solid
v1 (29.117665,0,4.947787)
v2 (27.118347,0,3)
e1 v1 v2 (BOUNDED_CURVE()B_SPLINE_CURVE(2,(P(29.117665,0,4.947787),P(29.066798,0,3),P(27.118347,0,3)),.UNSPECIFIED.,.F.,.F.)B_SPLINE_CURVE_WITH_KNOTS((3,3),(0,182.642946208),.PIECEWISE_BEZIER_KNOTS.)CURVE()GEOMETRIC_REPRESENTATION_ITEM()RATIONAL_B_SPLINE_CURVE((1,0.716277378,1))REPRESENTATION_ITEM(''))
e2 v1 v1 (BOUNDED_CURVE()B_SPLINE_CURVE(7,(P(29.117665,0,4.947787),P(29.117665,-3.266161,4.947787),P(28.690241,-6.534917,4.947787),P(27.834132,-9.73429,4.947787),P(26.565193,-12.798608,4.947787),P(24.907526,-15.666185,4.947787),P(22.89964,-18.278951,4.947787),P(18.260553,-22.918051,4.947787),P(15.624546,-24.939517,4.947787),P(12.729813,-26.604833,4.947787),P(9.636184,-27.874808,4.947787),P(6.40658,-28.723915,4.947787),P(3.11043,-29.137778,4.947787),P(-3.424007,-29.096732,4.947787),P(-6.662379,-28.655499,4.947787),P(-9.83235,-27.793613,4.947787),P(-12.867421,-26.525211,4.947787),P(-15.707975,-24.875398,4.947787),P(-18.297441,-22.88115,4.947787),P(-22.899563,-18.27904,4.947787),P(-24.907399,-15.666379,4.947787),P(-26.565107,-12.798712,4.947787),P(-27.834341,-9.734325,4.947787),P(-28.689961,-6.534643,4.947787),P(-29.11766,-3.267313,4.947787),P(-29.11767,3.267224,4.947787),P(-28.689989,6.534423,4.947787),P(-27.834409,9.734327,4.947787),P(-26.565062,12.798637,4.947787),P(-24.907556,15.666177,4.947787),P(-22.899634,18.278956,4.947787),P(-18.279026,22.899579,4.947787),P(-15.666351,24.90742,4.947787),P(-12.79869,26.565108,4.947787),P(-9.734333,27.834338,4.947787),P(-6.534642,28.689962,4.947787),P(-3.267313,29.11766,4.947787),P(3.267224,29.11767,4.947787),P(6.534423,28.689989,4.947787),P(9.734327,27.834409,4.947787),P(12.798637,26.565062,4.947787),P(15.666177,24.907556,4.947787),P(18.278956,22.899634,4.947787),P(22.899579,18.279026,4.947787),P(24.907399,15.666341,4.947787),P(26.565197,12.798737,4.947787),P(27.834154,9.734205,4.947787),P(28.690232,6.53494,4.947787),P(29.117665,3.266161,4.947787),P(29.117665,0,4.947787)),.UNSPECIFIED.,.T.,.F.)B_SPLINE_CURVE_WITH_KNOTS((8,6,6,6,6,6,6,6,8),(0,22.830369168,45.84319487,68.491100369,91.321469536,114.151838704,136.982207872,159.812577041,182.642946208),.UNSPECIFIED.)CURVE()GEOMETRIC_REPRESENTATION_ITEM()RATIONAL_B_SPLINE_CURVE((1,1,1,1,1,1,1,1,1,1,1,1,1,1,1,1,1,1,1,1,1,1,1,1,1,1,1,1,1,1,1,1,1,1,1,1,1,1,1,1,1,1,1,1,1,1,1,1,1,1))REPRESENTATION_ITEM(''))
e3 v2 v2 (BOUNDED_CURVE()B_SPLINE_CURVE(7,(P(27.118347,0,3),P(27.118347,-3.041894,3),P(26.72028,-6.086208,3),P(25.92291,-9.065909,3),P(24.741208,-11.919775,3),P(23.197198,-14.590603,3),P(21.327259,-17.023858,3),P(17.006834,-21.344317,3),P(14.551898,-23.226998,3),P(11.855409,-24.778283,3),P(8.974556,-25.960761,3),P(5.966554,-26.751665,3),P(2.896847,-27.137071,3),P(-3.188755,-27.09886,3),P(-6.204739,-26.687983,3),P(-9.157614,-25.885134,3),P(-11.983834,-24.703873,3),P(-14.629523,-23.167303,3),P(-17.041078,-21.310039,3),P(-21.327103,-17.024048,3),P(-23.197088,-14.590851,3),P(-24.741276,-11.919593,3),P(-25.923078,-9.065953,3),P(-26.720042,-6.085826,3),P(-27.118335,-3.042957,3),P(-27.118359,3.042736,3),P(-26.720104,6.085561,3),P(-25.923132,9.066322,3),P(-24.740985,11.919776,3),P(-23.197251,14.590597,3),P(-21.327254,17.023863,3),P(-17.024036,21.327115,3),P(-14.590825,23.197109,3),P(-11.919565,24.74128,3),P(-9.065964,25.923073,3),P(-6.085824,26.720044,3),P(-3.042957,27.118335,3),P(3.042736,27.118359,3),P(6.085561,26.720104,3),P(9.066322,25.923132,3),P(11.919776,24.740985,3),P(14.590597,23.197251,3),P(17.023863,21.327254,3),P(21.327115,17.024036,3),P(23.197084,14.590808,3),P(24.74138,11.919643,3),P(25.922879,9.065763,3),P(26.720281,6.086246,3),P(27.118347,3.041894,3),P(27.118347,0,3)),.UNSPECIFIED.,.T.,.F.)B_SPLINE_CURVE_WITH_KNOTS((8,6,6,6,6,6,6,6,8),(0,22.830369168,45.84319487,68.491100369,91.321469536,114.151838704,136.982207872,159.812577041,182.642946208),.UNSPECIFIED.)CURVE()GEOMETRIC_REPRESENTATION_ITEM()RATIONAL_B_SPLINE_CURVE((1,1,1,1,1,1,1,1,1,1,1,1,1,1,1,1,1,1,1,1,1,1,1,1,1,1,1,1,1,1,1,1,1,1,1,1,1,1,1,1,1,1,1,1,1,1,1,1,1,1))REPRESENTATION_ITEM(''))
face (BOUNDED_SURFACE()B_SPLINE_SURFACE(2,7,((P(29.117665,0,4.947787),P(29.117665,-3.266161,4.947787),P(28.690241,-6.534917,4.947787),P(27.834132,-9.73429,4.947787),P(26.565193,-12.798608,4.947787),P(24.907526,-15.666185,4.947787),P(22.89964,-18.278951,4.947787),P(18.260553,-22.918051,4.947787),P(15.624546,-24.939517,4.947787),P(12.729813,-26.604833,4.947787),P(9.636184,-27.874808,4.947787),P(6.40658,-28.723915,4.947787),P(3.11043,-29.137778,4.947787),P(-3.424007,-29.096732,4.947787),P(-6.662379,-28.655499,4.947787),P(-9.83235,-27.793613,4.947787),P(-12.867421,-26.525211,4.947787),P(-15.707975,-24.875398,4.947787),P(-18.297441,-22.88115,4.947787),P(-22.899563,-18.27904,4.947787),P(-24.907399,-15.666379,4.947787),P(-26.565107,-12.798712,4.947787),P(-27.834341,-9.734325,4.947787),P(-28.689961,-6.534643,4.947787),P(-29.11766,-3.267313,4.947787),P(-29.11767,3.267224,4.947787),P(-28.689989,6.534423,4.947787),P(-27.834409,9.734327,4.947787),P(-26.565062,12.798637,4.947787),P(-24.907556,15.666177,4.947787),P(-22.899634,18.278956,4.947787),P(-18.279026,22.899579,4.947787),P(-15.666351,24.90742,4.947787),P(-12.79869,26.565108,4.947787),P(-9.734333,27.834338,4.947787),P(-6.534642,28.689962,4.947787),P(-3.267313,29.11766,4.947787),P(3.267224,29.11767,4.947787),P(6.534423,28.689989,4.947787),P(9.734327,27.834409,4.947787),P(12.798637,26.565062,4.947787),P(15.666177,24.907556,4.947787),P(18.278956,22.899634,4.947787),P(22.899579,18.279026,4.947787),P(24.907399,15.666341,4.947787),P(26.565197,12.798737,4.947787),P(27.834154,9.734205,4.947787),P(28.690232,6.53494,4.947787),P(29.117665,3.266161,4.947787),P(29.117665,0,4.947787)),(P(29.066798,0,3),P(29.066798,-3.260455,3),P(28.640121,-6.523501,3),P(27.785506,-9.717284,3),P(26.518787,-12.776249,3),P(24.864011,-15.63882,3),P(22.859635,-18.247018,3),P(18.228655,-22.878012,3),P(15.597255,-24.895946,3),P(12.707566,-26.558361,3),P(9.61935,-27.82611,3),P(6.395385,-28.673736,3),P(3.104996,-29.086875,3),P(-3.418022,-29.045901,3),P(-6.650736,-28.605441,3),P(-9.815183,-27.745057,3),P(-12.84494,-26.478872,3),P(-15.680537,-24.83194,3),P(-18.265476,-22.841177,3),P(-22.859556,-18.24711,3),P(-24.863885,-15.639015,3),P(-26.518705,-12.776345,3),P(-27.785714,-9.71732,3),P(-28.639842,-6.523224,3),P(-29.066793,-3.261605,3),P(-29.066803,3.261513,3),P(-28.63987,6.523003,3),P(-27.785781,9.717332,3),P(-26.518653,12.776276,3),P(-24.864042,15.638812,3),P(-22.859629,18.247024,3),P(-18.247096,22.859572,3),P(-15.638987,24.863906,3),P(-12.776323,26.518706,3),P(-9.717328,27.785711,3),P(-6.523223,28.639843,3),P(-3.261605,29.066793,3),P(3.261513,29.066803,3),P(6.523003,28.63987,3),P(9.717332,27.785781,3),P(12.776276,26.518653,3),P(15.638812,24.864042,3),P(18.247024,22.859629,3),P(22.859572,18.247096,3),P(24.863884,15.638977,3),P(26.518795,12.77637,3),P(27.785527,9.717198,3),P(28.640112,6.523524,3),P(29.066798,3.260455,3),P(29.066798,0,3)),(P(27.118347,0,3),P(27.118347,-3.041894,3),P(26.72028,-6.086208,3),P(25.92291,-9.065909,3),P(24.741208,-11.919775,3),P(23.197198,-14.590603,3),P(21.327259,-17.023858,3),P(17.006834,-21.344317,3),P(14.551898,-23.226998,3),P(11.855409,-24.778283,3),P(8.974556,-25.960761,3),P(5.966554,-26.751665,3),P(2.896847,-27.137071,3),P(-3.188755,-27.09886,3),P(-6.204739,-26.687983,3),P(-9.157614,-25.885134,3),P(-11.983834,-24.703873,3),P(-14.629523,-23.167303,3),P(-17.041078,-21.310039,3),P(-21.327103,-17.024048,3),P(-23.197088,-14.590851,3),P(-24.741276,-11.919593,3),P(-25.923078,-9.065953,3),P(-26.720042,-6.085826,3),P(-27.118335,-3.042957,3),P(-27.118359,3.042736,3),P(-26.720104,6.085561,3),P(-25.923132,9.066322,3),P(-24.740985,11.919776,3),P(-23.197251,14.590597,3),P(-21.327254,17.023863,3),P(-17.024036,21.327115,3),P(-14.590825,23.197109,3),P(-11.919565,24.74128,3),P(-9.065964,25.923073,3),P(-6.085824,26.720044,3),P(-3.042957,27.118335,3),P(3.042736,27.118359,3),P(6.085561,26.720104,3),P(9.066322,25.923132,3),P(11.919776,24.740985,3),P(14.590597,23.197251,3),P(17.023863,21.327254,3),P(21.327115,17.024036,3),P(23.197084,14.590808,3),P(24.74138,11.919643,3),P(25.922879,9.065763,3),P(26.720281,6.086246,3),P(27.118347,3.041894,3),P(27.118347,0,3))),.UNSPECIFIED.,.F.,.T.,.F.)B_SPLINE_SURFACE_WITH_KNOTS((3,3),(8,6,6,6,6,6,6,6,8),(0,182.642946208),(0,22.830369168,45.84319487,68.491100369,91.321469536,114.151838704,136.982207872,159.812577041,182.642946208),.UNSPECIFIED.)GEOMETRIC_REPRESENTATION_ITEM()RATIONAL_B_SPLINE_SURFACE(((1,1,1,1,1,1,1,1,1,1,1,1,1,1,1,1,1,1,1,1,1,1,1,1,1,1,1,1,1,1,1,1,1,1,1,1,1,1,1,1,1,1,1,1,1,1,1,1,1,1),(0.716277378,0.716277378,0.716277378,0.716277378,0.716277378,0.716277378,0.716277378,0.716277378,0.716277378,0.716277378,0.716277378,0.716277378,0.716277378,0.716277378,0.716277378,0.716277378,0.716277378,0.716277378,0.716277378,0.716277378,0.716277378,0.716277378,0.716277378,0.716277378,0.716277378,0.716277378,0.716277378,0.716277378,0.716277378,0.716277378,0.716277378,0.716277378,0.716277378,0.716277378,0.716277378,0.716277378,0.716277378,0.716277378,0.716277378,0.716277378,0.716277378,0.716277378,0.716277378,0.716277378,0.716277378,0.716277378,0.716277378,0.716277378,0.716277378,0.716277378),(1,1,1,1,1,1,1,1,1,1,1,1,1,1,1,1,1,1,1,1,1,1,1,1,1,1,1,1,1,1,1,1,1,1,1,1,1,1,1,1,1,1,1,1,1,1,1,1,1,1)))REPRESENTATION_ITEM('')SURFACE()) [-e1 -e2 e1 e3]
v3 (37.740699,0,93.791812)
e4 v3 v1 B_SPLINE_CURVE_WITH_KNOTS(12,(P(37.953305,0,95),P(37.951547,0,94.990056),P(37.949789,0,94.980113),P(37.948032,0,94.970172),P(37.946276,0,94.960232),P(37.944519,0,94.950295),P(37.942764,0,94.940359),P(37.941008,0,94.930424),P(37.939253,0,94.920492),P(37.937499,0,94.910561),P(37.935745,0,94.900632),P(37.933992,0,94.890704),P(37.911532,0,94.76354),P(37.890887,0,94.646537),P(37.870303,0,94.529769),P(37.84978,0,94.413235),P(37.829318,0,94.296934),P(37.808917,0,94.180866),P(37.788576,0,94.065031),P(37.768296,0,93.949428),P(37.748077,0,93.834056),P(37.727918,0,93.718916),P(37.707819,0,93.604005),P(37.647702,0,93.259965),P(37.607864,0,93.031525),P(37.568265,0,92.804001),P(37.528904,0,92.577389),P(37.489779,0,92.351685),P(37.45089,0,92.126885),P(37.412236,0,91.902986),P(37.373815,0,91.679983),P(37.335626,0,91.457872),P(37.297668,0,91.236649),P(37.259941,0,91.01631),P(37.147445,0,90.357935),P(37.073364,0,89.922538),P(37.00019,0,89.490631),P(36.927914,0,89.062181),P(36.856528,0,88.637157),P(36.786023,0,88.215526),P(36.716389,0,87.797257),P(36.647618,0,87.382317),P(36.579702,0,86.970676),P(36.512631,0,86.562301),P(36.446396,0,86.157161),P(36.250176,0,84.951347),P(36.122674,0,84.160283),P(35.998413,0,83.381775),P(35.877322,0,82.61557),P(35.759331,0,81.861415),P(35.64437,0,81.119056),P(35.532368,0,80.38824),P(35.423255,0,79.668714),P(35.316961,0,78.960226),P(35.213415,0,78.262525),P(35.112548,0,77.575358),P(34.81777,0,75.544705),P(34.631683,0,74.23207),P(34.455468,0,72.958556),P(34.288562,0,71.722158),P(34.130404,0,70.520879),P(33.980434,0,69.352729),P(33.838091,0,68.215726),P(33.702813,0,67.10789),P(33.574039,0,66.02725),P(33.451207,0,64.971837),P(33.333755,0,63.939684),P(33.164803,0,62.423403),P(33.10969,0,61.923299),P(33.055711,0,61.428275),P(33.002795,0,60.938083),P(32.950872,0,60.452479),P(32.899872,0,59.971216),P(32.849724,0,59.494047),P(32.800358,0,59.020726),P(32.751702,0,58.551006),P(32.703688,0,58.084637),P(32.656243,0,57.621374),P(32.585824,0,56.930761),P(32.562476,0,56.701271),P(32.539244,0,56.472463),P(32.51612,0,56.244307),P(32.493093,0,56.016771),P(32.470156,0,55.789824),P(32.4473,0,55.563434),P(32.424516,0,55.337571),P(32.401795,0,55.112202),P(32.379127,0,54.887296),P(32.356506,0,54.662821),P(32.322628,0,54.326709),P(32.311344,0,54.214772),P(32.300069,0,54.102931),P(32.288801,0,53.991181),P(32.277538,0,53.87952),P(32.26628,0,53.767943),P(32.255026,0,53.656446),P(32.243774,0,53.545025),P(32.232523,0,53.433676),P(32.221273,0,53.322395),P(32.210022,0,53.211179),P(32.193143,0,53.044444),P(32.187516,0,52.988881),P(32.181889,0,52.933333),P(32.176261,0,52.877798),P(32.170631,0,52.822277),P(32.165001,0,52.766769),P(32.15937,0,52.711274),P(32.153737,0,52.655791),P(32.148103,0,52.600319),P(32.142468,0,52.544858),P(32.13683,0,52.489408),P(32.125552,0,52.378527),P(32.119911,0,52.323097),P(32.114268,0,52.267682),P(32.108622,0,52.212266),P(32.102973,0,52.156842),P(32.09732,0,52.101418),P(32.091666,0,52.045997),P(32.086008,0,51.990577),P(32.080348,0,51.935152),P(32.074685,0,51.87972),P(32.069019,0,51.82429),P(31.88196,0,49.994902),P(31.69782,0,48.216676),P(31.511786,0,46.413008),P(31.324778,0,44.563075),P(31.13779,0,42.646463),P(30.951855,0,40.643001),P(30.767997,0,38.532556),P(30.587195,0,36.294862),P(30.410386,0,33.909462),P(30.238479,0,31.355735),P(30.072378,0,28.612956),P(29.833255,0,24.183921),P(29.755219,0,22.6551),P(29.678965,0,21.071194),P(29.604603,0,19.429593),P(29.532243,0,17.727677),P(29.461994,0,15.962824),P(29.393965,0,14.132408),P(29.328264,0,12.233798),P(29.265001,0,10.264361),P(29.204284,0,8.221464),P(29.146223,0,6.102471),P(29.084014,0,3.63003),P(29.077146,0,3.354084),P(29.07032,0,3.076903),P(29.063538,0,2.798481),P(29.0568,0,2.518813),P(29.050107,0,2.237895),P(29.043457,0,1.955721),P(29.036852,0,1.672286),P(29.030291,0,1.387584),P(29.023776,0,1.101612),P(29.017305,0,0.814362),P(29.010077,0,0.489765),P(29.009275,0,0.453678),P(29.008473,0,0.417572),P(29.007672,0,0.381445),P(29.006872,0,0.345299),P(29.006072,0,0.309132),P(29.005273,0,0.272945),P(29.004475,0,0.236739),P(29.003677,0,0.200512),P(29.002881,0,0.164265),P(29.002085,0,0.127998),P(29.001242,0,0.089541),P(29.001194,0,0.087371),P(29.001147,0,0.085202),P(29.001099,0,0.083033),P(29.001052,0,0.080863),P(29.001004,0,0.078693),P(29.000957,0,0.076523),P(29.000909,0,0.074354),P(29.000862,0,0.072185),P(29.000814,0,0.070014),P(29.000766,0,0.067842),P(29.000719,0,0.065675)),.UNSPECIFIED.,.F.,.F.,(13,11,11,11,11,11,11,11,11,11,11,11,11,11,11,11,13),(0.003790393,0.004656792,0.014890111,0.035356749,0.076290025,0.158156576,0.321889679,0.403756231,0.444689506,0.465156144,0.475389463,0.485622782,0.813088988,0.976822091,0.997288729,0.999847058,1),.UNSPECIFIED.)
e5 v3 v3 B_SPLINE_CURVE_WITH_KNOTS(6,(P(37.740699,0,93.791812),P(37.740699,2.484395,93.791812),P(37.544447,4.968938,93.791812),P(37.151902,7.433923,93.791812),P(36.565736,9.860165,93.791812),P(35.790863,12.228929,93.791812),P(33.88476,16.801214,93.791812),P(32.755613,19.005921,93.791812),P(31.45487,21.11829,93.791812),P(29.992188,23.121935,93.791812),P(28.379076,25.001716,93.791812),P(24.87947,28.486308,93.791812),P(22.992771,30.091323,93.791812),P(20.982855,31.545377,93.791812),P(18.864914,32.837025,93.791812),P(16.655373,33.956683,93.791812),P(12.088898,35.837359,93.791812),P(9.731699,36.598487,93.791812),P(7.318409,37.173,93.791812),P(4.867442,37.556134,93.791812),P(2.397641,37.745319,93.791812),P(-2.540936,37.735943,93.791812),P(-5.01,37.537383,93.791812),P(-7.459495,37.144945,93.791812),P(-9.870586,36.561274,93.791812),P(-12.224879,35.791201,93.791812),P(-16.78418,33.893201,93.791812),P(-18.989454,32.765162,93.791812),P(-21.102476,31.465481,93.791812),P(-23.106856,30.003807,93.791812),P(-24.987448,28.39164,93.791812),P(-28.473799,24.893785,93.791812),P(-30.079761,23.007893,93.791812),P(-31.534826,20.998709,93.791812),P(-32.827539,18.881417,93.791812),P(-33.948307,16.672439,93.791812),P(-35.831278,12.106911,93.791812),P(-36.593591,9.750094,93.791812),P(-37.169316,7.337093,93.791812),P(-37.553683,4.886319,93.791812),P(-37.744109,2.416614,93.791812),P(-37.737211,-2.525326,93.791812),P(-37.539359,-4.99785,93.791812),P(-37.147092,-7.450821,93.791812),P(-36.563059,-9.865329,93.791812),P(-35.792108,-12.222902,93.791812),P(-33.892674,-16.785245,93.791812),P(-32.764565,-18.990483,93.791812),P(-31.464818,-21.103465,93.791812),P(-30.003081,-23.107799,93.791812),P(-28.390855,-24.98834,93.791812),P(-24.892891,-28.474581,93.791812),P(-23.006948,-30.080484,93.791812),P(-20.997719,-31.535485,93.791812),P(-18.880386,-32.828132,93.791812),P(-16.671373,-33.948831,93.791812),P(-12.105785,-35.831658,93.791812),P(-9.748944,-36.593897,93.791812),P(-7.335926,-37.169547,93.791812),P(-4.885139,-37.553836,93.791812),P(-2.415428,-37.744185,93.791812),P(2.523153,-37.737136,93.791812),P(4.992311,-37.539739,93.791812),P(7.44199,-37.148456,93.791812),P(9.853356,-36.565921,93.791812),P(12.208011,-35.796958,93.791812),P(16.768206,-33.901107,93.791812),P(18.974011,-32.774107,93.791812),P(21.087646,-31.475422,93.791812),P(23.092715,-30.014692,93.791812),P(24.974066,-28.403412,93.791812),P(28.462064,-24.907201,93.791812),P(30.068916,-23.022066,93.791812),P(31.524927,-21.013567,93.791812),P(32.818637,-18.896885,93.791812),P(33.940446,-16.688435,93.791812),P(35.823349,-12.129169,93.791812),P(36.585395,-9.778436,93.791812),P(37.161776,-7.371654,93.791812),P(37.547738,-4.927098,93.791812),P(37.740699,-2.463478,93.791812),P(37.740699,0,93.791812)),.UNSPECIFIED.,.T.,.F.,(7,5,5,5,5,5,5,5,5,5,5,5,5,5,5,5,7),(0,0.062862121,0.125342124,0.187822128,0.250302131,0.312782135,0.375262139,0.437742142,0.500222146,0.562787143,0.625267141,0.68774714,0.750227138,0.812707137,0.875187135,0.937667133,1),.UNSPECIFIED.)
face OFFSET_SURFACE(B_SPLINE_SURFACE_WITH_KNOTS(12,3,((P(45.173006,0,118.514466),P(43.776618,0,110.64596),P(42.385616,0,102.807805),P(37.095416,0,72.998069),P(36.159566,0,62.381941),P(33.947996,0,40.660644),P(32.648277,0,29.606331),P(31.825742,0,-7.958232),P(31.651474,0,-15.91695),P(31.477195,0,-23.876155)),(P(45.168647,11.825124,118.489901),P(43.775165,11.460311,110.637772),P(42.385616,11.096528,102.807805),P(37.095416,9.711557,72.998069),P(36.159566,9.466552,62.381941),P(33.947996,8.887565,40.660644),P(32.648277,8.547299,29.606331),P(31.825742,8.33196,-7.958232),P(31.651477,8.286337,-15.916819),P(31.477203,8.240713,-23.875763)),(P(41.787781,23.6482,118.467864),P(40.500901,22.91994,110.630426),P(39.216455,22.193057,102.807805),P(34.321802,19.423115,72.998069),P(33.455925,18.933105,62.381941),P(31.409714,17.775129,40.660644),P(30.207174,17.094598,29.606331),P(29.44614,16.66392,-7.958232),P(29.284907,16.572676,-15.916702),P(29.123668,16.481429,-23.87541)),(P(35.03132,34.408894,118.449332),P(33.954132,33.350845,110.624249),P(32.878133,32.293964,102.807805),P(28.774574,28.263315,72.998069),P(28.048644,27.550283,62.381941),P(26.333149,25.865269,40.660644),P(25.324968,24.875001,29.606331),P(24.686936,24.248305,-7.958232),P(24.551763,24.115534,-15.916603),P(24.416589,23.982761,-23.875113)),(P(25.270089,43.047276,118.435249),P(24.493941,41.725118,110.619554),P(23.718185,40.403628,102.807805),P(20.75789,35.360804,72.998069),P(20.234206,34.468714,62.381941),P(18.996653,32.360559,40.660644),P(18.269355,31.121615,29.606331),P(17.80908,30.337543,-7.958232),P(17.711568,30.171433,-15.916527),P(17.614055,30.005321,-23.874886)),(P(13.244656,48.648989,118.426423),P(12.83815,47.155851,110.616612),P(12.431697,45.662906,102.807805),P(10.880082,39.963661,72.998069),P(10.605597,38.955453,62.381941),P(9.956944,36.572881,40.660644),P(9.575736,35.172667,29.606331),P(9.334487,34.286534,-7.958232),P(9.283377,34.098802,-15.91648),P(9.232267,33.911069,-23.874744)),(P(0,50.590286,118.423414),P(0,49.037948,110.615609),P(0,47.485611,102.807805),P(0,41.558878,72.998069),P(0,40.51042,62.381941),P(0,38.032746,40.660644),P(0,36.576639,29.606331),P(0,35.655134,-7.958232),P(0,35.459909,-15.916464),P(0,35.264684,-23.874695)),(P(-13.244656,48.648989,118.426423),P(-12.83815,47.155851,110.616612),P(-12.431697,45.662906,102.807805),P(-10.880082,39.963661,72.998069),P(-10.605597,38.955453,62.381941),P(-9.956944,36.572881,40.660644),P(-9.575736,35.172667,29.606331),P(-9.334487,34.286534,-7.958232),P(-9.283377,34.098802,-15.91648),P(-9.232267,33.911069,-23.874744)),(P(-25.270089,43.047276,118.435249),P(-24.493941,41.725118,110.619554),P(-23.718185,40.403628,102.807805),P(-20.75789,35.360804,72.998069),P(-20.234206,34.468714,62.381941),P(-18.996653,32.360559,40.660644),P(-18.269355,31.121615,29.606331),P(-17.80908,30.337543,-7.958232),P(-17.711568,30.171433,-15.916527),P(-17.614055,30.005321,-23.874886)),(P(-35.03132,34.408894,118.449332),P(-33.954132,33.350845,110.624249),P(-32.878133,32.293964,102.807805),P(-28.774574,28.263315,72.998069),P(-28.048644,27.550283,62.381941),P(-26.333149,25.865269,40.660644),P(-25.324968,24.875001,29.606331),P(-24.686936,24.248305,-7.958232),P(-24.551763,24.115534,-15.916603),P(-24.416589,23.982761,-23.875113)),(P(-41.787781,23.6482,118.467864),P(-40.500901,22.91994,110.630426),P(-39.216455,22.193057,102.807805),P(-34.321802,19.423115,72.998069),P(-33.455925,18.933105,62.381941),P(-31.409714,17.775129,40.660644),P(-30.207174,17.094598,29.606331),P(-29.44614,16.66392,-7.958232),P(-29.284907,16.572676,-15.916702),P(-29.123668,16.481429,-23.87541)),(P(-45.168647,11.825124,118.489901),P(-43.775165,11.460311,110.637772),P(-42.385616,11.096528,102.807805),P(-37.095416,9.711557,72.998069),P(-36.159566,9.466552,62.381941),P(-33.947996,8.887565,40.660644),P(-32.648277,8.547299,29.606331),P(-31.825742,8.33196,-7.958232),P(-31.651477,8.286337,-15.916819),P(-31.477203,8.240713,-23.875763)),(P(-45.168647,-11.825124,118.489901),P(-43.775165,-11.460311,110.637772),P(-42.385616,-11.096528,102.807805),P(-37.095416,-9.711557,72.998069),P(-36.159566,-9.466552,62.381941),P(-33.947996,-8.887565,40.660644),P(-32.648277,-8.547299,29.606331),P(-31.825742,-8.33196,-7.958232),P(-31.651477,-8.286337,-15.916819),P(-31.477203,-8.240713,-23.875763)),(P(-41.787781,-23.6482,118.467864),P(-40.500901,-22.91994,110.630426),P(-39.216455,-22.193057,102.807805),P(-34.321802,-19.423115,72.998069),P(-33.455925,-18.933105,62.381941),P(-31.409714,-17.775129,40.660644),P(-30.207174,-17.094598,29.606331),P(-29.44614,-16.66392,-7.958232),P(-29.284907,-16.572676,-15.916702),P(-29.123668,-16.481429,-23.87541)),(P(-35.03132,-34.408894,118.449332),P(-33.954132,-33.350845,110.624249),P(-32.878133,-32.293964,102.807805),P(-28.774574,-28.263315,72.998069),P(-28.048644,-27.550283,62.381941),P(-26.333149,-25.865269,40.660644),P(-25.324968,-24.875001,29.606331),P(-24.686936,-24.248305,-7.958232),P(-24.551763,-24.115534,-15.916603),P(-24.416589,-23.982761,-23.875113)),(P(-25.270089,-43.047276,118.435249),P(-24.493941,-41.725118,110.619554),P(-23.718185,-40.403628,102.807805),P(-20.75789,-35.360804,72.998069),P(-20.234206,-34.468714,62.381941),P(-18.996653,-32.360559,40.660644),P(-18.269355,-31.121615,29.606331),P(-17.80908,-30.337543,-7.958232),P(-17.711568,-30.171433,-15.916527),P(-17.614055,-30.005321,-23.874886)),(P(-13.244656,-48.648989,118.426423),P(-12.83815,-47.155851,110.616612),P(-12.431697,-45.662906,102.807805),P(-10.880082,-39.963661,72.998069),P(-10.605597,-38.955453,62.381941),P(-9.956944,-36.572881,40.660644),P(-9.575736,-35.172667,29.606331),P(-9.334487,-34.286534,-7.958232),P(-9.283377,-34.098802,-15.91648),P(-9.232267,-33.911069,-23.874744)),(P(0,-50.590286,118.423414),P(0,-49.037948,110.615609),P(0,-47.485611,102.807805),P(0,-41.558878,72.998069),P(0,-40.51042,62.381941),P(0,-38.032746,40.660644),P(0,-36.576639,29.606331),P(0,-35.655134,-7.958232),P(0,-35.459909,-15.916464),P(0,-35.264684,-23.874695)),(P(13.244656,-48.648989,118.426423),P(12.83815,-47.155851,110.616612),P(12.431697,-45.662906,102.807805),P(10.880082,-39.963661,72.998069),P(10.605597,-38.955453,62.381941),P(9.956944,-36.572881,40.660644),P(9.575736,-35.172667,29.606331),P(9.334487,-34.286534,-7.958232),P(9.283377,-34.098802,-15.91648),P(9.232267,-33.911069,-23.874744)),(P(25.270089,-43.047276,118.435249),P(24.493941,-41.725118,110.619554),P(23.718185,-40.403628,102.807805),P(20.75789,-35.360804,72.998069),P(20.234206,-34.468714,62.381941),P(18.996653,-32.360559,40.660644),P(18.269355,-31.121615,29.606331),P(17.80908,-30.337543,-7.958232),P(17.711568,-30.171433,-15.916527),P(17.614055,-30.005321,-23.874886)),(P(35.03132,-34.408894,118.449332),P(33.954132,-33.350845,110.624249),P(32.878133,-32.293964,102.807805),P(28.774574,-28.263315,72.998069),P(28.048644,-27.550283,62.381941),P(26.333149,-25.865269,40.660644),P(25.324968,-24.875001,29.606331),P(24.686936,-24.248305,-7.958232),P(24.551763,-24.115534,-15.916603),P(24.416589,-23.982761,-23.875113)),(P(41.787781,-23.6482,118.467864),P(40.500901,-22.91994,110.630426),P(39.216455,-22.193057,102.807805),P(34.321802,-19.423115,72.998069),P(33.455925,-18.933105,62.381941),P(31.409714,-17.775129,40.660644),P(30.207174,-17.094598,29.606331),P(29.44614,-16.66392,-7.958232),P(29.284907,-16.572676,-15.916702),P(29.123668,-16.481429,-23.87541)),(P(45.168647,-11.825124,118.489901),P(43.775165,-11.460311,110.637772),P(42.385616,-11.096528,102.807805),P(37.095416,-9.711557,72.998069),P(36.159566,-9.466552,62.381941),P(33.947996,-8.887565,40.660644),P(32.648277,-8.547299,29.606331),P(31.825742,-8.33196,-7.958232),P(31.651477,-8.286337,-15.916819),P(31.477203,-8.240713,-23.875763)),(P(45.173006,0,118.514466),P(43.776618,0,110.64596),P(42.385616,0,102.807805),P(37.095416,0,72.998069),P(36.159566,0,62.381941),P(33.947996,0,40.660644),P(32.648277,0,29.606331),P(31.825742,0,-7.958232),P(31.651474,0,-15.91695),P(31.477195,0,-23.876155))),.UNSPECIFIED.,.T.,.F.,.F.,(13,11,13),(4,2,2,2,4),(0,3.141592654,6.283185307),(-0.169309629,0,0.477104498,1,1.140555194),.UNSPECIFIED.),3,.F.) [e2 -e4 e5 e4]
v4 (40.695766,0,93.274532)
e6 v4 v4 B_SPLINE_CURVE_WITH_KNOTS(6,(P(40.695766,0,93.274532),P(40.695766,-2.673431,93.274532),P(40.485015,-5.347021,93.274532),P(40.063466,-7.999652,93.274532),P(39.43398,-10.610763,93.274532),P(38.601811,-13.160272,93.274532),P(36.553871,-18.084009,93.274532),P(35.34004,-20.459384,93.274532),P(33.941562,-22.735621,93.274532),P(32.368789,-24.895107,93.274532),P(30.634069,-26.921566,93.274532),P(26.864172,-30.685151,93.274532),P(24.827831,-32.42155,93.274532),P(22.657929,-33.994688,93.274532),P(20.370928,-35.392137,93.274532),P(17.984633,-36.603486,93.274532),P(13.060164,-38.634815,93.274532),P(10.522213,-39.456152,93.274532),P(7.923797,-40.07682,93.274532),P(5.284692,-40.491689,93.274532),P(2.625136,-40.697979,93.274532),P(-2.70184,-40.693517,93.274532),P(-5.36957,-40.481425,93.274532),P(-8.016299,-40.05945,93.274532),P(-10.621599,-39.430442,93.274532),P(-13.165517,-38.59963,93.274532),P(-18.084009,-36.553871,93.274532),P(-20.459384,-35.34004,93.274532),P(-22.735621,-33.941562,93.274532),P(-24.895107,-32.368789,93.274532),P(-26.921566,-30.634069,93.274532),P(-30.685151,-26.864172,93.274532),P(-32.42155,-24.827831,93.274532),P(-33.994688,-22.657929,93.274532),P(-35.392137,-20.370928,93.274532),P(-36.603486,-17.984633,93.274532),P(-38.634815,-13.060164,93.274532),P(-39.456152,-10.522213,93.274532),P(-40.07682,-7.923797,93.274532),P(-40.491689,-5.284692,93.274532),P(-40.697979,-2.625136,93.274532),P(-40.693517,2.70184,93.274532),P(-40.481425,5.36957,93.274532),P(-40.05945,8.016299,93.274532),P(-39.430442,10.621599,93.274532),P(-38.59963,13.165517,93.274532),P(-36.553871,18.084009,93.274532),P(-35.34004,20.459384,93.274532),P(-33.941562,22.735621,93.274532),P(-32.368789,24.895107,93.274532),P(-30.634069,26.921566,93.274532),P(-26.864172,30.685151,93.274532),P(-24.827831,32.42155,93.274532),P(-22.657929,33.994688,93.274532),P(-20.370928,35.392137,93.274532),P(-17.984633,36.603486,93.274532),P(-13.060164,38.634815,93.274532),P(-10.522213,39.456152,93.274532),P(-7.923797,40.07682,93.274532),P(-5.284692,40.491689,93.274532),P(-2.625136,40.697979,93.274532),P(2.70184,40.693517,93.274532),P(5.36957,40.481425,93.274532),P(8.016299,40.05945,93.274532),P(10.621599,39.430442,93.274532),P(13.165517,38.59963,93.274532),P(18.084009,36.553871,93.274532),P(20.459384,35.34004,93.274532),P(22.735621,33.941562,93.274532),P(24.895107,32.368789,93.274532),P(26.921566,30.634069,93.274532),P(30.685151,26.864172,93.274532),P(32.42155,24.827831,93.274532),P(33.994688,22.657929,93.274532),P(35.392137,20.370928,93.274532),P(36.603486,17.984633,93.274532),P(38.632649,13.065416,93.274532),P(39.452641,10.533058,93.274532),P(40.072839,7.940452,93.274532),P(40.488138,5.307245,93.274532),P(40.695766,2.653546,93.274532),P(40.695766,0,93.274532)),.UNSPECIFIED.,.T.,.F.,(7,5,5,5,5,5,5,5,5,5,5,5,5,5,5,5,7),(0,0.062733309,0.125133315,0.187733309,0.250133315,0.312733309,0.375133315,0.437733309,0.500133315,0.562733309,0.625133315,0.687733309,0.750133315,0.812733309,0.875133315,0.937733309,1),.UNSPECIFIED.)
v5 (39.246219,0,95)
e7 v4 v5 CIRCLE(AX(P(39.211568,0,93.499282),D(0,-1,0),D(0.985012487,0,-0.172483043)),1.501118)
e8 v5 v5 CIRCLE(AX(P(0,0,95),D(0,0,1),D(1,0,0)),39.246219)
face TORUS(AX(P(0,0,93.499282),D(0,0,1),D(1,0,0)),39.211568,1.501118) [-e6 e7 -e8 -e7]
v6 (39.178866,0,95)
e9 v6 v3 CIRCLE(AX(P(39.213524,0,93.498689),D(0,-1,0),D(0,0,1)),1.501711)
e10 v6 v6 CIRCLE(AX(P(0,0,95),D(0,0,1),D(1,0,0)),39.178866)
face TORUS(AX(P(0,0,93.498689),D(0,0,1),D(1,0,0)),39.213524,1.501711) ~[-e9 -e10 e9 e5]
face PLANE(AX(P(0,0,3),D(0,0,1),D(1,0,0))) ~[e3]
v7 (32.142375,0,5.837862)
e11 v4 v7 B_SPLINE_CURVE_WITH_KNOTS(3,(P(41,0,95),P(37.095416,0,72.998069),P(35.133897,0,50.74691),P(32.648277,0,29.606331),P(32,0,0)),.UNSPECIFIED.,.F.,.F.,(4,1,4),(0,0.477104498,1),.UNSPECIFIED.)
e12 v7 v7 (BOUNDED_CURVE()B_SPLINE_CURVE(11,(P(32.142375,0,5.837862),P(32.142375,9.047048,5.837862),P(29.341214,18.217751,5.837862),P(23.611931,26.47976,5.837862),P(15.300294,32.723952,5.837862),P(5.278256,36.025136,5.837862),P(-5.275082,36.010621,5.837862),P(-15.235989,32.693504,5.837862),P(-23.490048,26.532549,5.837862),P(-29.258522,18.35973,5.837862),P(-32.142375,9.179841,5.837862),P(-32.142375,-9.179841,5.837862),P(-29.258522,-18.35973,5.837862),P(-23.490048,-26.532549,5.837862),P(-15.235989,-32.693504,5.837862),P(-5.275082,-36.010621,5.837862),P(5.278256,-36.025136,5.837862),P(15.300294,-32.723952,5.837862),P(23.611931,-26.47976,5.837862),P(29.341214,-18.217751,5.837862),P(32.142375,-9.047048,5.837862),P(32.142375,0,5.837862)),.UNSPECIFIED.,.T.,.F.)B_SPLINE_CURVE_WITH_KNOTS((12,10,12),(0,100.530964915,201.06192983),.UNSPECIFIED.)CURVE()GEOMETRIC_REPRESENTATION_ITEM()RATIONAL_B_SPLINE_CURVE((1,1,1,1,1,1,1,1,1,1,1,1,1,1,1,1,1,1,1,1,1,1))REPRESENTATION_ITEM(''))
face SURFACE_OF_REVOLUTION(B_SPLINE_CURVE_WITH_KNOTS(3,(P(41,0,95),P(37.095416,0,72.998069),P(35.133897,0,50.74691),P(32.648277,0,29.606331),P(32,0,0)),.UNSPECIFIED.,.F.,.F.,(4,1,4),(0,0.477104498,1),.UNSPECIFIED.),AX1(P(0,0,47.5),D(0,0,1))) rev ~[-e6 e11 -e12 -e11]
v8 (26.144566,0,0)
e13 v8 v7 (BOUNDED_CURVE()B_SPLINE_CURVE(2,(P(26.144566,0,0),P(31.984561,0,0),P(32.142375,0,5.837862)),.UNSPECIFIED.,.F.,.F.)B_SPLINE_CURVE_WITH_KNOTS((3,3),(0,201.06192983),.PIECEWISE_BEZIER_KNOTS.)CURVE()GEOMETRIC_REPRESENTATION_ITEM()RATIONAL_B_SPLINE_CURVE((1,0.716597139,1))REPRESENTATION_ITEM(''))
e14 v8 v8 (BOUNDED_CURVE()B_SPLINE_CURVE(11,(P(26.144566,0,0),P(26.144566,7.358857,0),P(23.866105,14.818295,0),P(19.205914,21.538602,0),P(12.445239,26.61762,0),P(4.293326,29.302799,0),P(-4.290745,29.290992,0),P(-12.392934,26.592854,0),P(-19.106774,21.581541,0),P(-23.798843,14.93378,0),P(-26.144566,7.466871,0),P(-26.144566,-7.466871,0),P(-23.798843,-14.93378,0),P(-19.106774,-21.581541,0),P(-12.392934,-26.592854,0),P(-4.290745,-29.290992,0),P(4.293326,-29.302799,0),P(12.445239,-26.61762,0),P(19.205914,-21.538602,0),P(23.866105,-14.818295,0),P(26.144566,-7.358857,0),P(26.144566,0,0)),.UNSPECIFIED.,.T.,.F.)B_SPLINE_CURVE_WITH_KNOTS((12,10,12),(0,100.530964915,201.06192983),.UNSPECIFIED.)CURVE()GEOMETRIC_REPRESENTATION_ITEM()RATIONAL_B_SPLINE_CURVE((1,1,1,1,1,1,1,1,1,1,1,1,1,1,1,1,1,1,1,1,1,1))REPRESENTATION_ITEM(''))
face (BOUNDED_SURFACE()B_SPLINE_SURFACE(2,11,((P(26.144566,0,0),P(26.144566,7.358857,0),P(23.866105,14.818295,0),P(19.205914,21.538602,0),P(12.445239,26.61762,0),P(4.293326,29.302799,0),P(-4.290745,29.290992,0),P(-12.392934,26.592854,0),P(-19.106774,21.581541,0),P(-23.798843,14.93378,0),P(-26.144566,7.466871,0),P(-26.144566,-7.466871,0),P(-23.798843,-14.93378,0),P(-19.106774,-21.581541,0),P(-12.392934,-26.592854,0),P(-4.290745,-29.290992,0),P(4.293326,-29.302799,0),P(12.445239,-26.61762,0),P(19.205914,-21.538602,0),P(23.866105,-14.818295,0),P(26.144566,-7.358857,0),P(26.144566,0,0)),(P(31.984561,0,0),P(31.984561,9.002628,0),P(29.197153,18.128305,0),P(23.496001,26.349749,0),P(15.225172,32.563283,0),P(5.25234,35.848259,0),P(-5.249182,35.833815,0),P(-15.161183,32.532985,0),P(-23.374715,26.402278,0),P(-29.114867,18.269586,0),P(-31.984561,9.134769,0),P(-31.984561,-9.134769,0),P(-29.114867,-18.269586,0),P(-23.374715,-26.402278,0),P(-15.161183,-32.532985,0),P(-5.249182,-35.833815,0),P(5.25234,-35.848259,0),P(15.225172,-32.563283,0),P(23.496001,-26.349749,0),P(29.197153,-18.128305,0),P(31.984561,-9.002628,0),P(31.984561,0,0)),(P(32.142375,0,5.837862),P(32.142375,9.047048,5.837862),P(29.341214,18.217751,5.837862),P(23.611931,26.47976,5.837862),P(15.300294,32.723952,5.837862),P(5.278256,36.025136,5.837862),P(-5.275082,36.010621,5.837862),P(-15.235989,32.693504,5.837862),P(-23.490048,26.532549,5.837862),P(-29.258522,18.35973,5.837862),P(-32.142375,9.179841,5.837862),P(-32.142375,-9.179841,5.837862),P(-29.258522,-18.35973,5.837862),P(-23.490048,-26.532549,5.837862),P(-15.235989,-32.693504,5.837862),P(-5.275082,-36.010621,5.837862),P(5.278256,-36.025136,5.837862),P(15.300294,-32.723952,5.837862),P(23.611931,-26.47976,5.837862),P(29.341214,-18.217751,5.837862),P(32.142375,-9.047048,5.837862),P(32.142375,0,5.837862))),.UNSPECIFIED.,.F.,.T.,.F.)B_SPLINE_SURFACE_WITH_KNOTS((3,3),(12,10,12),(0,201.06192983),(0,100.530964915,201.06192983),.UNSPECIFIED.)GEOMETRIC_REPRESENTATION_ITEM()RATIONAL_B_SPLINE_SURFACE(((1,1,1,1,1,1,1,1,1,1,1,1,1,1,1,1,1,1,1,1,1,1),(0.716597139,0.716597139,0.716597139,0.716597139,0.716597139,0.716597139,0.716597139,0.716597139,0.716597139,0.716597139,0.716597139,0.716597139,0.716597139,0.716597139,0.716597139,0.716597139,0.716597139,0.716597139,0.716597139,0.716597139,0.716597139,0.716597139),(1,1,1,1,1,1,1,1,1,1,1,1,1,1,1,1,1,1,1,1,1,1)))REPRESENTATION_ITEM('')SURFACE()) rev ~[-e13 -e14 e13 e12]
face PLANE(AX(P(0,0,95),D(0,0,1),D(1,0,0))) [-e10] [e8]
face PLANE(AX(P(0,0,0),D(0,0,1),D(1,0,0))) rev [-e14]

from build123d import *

# Parameters (mm, degrees)
F2_T = -3
F4_R = 6
F5_R = 2


# Not quite as in the source:
# - a fillet or chamfer that OpenCascade refuses, or shapes differently, is made with other operations: its cross-section is extruded or revolved along the edge and cut away or added


with BuildPart() as f1:
    # F0 (on Front) → F1 (revolve)
    with BuildSketch(Plane.XZ):
        with BuildLine():
            Line((0, 0), (32, 0))
            add(Edge.make_bspline(
                [(41, 95), (37.0954163373, 72.9980692267), (35.1338966625, 50.7469095039), (32.6482765377, 29.6063311398), (32, 0)],
                knots=[0, 0, 0, 0, 0.4771044984, 1, 1, 1, 1], degree=3))
            Line((41, 95), (0, 95))
            Line((0, 95), (0, 0))
        make_face()
    revolve(axis=Axis((0, 0, 47.5), (0, 0, 1)))

    # F2
    f2_openings = [f1.faces().sort_by_distance(p)[0] for p in [
        (0, 0, 95),
    ]]
    offset(amount=F2_T, openings=f2_openings)

    # F3: fillet of radius 1.5 on 2 edges, made by hand

    # F3_s1 → F3_t2 (revolve, cut)
    with BuildSketch(Plane.XZ):
        with BuildLine():
            ThreePointArc((40.6901882097, 93.2403640627), (40.3609203044, 94.4648618902), (39.2115677841, 95.0004))
            Line((39.2115677841, 95.0004), (39.2115677841, 95.1505118458))
            ThreePointArc((39.2115677841, 95.1505118458), (40.1057838921, 95.1501118458), (41, 95.1501118458))
            Line((41, 95.1501118458), (41.1478024426, 94.9737701655))
            ThreePointArc((41.1478024426, 94.9737701655), (40.9922261168, 94.0942423805), (40.8380502522, 93.2144723147))
            Line((40.8380502522, 93.2144723147), (40.6901882097, 93.2403640627))
        make_face()
    revolve(axis=Axis((0, 0, 95), (0, 0, 1)), mode=Mode.SUBTRACT)

    # F3_s3 → F3_t4 (revolve, cut)
    with BuildSketch(Plane.XZ):
        with BuildLine():
            ThreePointArc((39.2135241549, 95.0004), (38.2475626318, 94.6484951102), (37.7343202255, 93.7577084086))
            Line((37.7343202255, 93.7577084086), (37.5863998326, 93.7836103249))
            ThreePointArc((37.5863998326, 93.7836103249), (37.6958586295, 94.4048867535), (37.8054266398, 95.0261416646))
            Line((37.8054266398, 95.0261416646), (37.9533048508, 95.1501710755))
            ThreePointArc((37.9533048508, 95.1501710755), (38.5834145028, 95.1501710755), (39.2135241549, 95.1505710755))
            Line((39.2135241549, 95.1505710755), (39.2135241549, 95.0004))
        make_face()
    revolve(axis=Axis((-1e-09, -1e-10, 95), (0, 0, -1)), mode=Mode.SUBTRACT)

    # F4
    f4_edges = [f1.edges().sort_by_distance(p)[0] for p in [
        (-32, 0, 0),
    ]]
    fillet(f4_edges, radius=F4_R)

    # F5
    f5_edges = [f1.edges().sort_by_distance(p)[0] for p in [
        (-29.068528, 0, 3),
    ]]
    fillet(f5_edges, radius=F5_R)


solid = f1.part
